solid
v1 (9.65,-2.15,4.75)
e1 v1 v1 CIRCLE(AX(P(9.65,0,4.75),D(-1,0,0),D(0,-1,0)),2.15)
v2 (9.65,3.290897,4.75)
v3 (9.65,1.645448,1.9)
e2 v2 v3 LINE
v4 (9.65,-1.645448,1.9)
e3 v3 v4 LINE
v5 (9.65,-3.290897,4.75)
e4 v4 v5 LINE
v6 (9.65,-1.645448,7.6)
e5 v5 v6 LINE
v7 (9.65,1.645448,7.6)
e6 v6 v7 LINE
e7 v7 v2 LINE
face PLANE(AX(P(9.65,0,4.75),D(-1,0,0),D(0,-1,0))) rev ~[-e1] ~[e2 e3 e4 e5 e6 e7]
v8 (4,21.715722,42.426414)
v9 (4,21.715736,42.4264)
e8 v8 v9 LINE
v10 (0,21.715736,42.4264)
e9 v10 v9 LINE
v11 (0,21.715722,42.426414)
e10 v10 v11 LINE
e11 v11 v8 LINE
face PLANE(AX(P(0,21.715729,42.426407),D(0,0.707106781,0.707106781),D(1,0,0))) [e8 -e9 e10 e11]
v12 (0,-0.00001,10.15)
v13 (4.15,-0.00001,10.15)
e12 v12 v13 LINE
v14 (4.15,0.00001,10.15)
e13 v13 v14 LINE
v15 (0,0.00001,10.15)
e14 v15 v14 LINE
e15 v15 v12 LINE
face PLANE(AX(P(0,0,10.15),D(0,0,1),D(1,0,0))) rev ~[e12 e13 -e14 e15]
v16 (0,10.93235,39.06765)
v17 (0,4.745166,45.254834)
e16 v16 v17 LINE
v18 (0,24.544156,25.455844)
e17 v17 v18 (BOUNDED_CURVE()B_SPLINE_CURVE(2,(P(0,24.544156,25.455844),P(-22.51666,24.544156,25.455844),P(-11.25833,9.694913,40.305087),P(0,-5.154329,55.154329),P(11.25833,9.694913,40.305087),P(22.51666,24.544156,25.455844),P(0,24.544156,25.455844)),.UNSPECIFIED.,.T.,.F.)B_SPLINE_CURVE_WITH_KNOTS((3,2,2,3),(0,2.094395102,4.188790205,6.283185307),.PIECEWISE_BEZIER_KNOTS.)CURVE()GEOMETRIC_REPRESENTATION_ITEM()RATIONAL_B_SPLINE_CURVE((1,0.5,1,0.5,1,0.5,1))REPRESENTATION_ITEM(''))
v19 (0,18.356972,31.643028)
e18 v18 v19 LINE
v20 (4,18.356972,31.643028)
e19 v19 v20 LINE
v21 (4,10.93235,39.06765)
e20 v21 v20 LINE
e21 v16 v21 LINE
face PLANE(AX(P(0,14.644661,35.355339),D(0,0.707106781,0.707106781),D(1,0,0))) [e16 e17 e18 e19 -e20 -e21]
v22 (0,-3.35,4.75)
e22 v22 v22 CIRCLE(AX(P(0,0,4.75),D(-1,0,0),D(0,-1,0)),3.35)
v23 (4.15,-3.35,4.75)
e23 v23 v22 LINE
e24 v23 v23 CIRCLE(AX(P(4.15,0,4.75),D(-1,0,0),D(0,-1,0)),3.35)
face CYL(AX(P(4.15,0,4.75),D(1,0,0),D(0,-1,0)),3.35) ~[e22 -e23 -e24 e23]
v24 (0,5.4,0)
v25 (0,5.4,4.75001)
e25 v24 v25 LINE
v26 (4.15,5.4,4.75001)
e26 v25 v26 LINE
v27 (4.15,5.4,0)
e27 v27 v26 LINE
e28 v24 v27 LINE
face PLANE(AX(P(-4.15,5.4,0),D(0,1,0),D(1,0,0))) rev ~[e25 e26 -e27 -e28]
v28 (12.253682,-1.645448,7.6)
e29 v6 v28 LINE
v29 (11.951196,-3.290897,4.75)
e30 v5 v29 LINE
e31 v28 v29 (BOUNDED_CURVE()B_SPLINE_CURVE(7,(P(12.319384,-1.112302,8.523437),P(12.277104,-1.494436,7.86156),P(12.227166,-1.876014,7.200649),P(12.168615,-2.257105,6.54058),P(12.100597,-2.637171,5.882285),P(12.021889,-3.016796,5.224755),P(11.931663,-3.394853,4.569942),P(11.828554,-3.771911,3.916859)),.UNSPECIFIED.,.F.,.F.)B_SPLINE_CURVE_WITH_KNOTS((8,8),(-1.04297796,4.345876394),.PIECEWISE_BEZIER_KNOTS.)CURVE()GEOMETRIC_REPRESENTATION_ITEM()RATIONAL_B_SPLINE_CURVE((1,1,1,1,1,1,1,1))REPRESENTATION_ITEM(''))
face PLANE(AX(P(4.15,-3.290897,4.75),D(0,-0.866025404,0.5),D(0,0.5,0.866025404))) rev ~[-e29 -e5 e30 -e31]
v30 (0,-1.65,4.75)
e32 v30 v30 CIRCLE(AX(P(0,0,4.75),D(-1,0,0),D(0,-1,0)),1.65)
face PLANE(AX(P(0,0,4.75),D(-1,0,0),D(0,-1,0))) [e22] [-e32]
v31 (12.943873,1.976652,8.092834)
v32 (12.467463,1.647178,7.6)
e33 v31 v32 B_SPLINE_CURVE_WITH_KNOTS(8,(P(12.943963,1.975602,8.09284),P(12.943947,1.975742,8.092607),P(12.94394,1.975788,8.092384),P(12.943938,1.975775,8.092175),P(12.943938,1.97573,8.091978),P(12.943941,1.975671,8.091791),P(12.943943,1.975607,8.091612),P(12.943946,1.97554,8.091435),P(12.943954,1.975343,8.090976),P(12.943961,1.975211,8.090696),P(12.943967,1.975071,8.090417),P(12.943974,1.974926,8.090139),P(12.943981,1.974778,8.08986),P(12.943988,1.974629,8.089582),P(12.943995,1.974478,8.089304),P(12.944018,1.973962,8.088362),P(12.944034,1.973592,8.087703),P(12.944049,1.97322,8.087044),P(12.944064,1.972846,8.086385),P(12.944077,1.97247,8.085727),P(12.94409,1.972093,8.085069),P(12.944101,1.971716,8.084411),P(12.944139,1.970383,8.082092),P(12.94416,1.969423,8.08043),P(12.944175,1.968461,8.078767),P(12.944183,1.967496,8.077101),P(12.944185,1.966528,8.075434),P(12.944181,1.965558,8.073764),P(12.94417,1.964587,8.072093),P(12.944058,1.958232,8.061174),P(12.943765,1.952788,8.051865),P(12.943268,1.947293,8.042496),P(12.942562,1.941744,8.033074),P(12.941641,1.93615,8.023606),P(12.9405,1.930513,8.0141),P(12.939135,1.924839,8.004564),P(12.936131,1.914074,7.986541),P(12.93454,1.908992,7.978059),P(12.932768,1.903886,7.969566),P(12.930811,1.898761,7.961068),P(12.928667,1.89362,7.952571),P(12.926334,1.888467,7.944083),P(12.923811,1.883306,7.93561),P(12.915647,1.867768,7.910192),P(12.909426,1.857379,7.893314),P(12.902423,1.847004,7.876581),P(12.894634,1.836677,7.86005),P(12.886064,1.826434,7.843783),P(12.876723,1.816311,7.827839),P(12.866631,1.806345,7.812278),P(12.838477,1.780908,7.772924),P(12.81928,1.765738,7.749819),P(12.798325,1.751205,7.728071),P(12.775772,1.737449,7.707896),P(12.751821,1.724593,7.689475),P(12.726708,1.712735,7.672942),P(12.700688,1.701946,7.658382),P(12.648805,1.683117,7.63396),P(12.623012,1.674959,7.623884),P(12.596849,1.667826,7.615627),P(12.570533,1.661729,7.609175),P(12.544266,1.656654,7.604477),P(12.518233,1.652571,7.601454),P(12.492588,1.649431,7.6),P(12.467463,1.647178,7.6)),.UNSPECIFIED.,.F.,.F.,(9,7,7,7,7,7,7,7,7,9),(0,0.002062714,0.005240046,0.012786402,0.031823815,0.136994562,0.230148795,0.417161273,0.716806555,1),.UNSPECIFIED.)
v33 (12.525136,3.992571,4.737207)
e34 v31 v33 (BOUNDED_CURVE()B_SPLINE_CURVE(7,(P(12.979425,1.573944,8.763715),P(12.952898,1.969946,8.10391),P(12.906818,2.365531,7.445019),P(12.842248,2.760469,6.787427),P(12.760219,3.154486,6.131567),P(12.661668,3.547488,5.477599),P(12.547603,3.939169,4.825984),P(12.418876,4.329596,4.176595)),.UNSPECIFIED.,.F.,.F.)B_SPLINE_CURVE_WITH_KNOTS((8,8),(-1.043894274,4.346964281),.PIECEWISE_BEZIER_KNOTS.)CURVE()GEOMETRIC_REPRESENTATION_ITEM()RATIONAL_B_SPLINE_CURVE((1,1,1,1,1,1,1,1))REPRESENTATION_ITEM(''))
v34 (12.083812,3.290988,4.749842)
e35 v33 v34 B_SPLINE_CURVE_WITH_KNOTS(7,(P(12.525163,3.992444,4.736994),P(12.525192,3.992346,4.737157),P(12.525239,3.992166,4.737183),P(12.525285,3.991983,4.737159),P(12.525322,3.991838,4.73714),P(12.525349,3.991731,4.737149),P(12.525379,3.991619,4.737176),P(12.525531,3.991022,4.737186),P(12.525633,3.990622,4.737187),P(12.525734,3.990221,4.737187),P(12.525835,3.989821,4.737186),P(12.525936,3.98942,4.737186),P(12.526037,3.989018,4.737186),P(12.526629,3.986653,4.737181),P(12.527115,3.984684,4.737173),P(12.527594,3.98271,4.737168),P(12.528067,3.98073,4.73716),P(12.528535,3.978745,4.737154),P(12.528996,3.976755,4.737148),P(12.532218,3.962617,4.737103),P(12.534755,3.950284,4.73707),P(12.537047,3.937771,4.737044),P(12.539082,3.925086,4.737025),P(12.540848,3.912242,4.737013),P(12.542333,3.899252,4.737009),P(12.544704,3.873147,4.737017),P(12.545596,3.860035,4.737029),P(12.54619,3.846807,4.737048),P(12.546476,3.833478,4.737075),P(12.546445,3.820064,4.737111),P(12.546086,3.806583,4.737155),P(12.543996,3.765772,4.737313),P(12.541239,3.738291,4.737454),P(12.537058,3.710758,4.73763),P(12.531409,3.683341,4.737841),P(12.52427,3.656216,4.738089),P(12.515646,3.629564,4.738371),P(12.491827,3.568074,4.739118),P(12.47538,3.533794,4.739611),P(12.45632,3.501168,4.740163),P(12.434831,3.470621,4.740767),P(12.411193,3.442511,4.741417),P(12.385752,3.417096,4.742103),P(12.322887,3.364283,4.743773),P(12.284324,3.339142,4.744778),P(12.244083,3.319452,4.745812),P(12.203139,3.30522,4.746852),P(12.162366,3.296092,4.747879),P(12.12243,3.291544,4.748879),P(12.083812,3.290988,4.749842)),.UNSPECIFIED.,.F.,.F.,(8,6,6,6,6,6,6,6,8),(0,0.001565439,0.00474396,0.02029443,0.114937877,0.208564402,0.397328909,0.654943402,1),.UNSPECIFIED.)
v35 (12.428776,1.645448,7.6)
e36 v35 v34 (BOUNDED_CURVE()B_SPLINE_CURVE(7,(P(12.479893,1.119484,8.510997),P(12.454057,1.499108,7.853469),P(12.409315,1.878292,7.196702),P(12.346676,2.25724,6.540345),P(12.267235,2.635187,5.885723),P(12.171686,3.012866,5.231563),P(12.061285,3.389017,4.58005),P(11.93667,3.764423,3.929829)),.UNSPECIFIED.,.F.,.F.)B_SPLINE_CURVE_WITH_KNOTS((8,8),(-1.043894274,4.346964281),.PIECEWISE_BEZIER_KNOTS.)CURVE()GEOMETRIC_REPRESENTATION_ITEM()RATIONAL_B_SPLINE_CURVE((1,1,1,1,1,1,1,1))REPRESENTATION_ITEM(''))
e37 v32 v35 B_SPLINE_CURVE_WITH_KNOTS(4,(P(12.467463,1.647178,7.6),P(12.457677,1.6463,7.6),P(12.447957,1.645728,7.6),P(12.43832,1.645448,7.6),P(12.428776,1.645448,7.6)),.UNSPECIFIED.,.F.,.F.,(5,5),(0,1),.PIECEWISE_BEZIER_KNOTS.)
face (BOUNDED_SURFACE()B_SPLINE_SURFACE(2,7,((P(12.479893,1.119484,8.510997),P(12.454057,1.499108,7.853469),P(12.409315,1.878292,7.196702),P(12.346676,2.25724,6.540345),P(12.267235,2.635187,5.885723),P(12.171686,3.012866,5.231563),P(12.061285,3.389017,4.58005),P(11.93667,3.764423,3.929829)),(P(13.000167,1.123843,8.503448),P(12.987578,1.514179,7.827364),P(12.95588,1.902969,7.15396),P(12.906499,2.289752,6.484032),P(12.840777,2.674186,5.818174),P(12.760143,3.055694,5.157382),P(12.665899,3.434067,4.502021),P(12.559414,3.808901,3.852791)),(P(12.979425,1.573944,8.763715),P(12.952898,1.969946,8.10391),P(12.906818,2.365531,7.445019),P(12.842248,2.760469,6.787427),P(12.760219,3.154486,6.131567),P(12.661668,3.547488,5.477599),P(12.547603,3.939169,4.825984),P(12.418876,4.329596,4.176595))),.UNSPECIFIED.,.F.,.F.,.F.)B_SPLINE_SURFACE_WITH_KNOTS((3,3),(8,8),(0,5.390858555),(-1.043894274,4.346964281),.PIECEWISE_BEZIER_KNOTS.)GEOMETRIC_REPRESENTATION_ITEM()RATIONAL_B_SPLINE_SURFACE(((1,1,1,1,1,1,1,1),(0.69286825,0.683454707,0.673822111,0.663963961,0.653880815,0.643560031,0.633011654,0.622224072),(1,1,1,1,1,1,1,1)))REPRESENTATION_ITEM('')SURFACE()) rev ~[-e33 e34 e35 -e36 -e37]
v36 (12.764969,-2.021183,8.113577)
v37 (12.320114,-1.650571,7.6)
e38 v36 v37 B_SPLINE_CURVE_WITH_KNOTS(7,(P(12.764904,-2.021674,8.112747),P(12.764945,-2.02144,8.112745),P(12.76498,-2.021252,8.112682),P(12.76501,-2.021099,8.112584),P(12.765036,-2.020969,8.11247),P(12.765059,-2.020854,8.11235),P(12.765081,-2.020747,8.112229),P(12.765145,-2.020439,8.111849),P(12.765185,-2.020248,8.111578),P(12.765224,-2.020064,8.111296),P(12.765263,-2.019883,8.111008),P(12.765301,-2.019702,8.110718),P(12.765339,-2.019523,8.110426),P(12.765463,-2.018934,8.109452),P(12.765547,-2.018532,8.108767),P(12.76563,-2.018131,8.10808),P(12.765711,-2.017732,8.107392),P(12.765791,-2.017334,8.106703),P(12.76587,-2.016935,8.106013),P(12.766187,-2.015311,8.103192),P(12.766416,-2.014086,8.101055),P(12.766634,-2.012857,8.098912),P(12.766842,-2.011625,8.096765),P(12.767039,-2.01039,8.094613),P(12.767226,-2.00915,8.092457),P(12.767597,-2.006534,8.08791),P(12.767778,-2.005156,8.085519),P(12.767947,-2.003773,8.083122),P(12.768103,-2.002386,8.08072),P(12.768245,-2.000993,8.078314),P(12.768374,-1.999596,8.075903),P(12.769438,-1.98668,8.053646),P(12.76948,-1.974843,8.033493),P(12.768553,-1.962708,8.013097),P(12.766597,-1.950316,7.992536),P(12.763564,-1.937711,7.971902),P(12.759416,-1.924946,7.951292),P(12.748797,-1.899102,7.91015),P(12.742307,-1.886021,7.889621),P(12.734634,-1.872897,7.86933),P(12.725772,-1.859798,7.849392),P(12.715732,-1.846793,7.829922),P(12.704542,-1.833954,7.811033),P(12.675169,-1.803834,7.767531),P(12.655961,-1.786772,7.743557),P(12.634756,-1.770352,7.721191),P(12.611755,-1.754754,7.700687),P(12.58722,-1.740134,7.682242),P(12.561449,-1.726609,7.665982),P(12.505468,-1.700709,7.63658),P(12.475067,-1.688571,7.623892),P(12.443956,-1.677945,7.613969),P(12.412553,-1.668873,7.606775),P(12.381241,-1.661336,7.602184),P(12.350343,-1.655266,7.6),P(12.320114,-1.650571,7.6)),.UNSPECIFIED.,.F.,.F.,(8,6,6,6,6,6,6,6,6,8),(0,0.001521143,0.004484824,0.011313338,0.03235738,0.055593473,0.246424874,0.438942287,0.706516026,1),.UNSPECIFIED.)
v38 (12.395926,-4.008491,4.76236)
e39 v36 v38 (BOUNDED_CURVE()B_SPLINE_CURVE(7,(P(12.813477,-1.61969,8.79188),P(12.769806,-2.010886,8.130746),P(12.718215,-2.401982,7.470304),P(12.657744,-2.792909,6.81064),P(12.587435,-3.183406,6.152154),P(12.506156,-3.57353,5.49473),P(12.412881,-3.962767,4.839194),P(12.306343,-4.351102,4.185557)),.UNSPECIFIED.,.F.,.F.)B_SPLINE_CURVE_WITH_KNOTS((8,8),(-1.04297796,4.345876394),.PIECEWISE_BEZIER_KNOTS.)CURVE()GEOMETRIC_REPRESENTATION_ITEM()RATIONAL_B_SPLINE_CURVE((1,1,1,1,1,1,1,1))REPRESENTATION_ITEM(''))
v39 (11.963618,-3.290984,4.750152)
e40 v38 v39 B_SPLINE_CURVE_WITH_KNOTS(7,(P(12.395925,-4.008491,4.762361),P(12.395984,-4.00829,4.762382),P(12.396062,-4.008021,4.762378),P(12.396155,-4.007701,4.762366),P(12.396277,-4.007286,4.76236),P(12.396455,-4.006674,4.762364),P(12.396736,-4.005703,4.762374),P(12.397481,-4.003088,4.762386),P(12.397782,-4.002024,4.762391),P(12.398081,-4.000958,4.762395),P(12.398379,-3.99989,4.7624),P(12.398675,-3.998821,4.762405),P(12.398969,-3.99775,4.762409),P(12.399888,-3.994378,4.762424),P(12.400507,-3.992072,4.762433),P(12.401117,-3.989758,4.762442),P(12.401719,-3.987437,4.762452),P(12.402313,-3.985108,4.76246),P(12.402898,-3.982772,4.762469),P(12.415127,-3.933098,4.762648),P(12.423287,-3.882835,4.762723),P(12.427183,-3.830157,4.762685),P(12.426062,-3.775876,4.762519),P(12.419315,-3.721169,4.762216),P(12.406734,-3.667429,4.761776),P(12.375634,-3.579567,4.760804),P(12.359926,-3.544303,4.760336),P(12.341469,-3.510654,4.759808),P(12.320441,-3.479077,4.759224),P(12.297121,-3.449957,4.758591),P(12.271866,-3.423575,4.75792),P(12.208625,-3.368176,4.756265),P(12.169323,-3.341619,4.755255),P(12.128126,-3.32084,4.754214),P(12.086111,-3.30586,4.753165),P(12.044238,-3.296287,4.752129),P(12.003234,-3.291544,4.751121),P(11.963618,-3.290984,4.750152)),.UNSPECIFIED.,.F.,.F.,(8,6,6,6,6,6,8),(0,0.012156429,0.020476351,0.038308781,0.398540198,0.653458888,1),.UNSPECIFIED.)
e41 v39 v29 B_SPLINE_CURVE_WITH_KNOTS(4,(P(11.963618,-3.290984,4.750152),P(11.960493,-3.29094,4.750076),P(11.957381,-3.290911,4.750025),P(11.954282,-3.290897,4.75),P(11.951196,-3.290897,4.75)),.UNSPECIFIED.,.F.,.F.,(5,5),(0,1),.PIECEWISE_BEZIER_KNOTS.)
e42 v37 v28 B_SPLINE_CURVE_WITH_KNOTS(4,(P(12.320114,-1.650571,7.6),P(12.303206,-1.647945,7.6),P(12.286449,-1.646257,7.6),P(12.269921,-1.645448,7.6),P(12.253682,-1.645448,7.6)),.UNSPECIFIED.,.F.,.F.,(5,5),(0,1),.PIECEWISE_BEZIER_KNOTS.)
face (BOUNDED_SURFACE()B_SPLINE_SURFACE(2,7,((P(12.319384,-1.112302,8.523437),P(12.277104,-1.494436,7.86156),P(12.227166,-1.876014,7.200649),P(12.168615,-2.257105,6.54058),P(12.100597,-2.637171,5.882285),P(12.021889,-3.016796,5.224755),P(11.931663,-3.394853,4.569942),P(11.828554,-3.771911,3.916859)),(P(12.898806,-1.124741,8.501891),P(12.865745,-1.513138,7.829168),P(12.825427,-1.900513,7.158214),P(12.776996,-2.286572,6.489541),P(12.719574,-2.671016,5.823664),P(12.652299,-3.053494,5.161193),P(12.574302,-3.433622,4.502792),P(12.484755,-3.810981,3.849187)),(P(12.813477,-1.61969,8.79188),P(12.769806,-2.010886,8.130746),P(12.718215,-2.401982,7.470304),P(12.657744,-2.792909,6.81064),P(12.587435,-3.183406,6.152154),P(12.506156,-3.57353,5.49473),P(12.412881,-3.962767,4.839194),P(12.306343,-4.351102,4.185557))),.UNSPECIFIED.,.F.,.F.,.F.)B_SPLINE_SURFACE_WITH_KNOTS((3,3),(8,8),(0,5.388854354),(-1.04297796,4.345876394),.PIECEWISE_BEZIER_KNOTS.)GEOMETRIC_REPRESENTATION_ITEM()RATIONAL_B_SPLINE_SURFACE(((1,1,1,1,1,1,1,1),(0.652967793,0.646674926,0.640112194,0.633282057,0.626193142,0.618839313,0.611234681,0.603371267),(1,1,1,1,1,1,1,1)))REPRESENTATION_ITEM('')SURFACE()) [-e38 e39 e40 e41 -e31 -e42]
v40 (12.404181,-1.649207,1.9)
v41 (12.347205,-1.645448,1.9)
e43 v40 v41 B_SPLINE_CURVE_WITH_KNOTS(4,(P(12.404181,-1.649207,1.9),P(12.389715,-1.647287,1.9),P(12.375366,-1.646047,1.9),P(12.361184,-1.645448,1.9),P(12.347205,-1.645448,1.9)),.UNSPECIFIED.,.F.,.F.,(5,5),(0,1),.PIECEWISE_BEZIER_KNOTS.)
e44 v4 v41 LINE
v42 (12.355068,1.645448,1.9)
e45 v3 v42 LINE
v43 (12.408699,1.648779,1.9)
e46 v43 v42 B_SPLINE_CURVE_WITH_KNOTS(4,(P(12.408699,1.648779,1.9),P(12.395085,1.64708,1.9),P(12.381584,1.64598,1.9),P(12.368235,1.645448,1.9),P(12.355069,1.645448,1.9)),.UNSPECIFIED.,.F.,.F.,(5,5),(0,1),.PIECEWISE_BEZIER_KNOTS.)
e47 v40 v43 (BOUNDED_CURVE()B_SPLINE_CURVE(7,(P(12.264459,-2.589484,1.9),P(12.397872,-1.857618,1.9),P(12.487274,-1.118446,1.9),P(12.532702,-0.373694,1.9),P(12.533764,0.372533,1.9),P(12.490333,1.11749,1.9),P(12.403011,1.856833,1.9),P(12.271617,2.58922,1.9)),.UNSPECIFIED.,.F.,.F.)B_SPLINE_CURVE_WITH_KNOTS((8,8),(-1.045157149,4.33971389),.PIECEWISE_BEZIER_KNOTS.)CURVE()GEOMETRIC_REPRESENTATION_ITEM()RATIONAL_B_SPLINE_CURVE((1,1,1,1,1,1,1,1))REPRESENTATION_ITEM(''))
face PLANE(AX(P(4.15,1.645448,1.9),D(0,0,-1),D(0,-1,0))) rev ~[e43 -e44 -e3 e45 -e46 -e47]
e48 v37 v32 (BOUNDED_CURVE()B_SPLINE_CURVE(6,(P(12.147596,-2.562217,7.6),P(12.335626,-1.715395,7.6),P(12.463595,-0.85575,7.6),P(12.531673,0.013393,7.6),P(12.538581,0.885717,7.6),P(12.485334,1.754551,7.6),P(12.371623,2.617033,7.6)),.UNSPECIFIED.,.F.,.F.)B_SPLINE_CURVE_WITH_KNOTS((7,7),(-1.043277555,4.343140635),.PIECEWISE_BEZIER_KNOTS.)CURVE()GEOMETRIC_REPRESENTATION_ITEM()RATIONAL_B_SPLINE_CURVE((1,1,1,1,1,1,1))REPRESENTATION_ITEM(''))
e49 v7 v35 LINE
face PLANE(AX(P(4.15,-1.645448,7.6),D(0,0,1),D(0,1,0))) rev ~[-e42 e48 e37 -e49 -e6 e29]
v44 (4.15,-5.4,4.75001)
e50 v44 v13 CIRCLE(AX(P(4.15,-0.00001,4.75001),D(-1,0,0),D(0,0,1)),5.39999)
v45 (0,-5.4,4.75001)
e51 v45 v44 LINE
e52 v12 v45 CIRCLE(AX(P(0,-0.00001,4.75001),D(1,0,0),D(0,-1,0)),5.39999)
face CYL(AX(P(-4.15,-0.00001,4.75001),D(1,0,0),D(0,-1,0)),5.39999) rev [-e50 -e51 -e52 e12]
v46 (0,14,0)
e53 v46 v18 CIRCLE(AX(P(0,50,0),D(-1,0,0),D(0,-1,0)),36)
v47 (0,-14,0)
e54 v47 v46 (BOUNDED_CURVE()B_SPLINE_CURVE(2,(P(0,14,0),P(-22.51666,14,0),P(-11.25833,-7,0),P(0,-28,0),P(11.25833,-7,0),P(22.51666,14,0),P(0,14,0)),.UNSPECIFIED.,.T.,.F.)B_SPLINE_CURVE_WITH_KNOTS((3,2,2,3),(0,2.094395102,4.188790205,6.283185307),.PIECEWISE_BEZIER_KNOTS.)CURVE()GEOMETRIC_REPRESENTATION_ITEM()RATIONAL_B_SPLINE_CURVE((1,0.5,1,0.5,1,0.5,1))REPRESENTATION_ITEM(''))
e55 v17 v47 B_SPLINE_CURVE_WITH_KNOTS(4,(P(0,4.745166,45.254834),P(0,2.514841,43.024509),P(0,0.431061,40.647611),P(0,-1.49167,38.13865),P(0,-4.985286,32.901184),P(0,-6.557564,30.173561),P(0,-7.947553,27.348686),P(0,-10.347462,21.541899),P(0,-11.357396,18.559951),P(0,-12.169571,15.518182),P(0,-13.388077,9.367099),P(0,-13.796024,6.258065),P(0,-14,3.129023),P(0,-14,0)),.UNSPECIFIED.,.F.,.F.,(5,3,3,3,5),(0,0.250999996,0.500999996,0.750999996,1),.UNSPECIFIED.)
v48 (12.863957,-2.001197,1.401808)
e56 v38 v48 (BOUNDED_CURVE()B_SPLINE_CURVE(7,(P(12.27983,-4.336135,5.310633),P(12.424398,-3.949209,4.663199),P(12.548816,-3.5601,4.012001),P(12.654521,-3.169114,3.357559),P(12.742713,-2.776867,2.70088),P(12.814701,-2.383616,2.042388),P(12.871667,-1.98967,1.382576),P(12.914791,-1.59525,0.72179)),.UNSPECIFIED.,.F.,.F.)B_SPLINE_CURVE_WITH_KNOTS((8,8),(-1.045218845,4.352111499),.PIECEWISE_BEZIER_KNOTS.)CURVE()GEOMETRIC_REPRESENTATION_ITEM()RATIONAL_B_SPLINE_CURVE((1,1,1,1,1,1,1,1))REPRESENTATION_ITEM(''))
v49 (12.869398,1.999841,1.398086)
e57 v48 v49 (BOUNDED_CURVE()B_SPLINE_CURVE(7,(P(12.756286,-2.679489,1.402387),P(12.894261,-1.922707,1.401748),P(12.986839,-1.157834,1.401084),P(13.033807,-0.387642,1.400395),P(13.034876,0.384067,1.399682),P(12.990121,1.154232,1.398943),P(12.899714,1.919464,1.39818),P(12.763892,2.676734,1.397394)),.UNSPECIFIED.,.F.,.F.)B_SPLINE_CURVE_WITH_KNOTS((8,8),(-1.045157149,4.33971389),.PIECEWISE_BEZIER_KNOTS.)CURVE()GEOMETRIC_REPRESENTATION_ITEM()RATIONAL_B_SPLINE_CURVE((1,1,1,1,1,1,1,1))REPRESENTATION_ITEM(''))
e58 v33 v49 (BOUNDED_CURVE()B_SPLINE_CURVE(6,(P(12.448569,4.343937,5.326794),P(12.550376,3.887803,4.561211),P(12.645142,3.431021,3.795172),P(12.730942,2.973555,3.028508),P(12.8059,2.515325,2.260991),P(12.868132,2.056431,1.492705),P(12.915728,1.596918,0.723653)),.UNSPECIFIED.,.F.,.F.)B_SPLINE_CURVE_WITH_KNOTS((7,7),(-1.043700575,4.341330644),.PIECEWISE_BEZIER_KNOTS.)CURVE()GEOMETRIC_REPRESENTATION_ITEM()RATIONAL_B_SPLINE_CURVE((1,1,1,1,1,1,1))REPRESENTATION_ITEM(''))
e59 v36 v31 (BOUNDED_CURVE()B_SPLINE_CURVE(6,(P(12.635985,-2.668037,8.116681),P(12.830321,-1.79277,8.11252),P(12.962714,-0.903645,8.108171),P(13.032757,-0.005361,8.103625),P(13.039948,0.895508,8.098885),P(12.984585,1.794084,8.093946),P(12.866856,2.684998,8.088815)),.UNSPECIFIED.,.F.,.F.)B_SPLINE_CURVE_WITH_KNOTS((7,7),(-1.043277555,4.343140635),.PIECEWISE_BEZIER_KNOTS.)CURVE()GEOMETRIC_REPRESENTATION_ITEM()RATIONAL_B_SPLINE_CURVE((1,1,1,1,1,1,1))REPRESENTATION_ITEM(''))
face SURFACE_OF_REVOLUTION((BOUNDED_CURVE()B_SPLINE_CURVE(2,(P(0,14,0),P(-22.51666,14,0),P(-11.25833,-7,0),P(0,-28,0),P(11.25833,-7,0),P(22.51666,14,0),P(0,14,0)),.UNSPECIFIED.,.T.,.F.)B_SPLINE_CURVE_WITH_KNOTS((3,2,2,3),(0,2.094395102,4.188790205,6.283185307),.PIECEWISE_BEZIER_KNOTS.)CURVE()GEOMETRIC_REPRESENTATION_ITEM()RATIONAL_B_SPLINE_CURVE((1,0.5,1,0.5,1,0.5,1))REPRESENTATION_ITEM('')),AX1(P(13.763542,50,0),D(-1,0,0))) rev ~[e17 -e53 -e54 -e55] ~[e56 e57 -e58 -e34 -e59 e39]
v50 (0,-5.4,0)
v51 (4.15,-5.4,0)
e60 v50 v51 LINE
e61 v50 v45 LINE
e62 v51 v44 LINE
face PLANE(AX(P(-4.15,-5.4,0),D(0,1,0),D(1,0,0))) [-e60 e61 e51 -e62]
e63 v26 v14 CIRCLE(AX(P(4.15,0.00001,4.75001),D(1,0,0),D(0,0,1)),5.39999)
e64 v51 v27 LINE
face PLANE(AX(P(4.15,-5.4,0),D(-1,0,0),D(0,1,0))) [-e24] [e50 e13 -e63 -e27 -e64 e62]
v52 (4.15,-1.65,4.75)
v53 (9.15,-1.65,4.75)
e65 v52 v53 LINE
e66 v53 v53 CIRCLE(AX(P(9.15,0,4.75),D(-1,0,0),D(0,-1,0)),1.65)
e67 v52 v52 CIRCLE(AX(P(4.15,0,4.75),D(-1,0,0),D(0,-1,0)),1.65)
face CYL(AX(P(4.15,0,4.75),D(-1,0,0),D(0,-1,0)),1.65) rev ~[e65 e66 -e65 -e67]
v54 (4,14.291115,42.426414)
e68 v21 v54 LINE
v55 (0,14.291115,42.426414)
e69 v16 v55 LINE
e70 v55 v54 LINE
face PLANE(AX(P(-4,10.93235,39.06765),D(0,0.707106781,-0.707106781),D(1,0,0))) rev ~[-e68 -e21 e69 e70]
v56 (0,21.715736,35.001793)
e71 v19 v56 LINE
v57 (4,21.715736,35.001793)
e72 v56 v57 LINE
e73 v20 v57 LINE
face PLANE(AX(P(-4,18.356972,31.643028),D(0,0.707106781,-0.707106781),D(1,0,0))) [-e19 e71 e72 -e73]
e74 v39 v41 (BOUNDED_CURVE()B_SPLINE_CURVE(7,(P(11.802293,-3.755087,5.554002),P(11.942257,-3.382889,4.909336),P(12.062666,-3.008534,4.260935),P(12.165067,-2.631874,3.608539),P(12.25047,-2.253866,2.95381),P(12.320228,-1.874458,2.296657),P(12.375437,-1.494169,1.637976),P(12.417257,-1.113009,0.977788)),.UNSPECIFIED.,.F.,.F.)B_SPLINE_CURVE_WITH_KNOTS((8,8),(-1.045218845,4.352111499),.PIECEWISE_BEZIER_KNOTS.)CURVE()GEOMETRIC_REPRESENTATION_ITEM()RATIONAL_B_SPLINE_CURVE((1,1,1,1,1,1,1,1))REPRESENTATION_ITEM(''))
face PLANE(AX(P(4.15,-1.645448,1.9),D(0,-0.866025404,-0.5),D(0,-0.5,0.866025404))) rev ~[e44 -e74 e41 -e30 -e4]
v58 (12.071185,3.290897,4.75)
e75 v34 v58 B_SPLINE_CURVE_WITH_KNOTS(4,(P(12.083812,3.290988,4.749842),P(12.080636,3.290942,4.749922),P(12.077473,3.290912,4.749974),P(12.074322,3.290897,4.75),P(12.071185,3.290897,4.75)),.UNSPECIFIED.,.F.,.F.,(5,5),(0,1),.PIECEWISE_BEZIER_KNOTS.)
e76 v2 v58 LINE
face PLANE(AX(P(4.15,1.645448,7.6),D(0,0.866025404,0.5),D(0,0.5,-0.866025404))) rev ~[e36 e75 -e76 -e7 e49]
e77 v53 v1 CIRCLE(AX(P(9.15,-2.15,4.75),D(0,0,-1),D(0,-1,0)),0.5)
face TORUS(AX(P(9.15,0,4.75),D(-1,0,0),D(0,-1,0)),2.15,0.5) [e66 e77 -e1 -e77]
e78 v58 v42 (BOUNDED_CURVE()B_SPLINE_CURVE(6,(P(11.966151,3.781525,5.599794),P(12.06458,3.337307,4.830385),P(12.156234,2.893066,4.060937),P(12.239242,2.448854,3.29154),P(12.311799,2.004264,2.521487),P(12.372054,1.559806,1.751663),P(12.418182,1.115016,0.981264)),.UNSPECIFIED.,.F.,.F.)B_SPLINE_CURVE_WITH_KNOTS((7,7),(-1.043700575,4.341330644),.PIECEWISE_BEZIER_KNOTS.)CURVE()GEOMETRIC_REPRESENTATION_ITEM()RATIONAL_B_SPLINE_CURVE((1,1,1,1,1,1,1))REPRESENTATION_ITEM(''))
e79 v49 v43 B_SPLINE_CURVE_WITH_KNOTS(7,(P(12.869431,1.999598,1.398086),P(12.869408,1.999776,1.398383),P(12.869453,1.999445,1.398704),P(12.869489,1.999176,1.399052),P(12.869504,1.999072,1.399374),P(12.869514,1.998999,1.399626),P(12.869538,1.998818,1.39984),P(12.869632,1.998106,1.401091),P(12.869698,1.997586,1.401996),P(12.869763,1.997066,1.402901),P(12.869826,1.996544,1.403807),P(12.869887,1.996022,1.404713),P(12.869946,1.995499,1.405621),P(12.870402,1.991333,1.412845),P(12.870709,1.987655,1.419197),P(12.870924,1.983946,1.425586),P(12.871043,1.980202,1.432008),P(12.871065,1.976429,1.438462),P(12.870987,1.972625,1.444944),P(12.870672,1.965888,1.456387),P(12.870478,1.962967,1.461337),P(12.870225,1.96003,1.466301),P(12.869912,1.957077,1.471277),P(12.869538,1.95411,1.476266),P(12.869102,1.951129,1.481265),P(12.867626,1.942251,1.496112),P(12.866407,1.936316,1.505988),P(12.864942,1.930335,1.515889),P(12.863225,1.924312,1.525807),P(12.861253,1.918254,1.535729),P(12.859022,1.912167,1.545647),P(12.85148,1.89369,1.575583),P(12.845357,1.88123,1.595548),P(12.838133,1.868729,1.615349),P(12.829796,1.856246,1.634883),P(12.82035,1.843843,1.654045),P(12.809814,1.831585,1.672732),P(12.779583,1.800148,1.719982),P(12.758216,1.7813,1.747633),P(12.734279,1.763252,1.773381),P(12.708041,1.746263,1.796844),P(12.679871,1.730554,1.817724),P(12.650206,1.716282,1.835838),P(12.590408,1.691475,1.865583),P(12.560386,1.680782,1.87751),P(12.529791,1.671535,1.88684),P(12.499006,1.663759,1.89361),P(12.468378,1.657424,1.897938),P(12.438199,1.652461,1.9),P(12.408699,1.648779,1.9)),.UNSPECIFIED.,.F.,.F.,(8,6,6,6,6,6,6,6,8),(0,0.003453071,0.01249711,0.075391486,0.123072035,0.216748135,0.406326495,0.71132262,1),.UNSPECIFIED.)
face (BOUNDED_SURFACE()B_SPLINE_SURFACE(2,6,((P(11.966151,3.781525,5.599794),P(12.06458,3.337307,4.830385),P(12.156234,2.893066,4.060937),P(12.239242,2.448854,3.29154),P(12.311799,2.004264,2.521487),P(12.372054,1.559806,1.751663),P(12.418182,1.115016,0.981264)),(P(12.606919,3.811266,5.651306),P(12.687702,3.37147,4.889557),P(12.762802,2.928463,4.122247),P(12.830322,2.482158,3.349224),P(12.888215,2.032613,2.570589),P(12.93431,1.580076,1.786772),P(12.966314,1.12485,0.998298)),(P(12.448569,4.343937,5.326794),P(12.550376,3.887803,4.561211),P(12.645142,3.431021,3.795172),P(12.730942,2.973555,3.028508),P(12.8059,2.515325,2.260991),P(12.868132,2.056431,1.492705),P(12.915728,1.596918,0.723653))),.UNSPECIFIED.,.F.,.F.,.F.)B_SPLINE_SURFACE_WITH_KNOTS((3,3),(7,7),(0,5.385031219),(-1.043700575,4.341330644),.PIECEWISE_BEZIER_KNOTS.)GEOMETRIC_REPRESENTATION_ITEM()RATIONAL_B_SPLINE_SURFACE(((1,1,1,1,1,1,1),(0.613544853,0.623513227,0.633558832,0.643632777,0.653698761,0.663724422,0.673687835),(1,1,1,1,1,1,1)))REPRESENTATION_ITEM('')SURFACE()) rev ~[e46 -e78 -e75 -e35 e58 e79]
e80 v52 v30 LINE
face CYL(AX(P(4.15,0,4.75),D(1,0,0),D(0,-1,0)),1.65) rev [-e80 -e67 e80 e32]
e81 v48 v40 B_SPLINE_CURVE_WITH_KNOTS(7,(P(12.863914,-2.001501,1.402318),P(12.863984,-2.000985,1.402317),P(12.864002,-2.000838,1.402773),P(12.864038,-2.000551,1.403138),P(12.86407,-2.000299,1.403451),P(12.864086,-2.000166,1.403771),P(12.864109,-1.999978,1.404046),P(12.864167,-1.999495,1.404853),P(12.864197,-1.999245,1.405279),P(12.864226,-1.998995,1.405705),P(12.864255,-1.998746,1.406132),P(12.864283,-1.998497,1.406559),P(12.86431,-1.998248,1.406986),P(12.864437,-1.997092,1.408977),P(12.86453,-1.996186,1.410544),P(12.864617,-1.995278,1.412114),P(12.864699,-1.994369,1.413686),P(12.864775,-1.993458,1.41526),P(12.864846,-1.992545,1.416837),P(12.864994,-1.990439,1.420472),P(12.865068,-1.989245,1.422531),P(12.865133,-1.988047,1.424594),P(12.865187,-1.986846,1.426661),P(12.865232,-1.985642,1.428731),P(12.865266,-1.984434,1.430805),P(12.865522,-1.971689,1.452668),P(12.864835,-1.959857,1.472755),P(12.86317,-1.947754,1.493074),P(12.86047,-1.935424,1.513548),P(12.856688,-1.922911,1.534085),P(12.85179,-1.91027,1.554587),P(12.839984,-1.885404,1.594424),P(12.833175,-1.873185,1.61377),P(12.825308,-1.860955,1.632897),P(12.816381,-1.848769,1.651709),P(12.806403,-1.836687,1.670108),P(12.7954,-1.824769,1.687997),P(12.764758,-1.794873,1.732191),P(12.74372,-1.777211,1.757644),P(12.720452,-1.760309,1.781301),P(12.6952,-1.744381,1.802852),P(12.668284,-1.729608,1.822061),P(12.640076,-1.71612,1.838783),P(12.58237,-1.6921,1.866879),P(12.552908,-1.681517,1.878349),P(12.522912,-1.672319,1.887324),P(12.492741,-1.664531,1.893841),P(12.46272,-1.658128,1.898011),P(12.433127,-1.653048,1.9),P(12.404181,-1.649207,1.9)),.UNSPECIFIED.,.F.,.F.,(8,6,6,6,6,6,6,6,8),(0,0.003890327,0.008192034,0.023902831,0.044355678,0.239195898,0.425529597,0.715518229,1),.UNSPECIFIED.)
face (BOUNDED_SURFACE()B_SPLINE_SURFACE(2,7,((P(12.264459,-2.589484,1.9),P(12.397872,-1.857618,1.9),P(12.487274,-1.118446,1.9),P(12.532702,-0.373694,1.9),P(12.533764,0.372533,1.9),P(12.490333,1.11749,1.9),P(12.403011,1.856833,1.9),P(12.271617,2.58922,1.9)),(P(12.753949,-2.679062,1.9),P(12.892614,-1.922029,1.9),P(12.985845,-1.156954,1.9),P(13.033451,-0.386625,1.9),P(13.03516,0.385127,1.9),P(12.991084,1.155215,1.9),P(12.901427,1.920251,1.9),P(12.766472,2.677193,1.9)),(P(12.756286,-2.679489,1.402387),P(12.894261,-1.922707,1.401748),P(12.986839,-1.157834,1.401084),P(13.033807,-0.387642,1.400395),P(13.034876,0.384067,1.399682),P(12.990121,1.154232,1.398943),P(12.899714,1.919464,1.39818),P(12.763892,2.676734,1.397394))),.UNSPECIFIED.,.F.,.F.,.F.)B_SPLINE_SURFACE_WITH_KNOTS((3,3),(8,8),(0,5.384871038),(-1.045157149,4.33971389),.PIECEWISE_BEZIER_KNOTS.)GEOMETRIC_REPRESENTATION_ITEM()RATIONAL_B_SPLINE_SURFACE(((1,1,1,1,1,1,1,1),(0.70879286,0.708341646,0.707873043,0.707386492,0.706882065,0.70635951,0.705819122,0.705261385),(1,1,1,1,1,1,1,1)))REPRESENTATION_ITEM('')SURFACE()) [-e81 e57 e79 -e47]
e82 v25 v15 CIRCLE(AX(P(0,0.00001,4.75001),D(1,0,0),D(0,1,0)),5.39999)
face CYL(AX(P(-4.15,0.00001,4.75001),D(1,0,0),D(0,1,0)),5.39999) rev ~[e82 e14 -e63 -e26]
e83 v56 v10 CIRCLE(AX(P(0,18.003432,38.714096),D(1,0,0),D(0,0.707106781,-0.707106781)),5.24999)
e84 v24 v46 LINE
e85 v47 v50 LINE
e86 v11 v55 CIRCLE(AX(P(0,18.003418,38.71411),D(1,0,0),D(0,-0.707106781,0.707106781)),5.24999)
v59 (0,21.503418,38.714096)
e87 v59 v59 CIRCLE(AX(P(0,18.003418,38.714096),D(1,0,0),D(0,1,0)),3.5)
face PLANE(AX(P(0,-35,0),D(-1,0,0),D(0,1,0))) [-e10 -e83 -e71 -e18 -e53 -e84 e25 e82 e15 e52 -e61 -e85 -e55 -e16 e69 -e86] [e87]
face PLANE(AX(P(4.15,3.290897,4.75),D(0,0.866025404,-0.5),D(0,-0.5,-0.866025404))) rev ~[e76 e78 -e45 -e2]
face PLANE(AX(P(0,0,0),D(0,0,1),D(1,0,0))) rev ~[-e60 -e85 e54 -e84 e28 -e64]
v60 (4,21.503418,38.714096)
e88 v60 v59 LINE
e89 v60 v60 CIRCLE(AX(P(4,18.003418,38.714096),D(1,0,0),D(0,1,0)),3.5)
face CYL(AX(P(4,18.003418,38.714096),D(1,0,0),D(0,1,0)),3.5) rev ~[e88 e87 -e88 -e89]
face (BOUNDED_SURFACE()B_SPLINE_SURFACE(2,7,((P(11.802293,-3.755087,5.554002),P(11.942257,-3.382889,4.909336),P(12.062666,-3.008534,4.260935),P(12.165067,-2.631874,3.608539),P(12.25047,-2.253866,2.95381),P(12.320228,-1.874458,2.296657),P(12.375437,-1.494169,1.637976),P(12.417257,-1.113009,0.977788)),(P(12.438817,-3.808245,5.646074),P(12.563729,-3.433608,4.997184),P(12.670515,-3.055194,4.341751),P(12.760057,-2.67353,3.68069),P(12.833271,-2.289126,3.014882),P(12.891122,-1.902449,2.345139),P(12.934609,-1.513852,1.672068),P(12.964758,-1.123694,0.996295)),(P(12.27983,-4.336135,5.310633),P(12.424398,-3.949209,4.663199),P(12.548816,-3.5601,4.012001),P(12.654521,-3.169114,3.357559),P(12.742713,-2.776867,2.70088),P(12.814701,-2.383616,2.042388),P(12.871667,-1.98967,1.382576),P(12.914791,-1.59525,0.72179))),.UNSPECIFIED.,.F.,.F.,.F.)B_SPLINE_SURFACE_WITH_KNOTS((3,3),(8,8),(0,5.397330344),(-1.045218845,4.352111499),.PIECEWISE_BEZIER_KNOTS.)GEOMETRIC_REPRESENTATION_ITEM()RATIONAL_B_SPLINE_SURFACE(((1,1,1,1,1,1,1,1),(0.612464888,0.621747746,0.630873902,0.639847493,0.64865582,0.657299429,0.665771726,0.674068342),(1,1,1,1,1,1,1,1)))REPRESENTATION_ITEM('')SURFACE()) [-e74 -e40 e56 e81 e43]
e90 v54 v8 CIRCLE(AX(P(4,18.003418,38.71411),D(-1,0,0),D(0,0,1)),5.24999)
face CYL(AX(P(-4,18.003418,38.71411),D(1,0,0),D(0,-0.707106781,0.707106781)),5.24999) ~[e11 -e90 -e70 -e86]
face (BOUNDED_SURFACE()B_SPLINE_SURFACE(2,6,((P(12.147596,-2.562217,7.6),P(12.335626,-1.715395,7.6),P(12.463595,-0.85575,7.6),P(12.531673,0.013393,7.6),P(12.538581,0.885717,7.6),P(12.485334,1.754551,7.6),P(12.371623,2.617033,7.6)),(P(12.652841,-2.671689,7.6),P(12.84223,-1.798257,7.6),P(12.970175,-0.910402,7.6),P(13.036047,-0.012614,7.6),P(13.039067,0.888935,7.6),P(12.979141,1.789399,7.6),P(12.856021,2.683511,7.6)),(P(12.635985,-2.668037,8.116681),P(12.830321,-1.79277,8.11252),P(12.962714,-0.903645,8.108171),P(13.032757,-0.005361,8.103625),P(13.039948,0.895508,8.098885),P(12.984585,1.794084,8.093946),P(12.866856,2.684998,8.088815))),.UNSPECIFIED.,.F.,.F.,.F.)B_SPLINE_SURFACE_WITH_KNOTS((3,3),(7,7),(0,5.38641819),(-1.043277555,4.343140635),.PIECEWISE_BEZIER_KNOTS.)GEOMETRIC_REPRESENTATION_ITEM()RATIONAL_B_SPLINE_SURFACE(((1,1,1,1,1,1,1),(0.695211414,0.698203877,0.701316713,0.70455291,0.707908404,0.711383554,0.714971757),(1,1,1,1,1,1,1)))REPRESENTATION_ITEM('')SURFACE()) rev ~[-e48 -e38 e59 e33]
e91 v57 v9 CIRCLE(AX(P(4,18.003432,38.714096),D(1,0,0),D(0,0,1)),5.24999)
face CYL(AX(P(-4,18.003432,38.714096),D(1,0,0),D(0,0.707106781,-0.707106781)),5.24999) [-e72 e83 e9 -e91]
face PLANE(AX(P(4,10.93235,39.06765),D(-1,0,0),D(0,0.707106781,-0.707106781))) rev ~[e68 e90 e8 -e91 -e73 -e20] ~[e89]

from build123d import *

# Parameters (mm, degrees)
F0_W      = 8.3
F0_H      = 10.8
F1_ANGLE  = 45
F2_W      = 8
F2_H      = 10.5
F3_DEPTH  = 10
F4_R      = 5.24999
F5_R      = 3.5
F6_DEPTH  = 17.0010001
F7_DEPTH  = 10.15
F8_R      = 5.39999
F9_W      = 20
F9_H      = 70
F10_DEPTH = 50
F11_R     = 3.35
F11_R_2   = 1.65
F12_DEPTH = 4.15
F13_DEPTH = 25
F14_R     = 1.65
F15_DEPTH = 25
F16_DEPTH = 5.5
F17_R     = 0.5


# Not quite as in the source:
# - a fillet or chamfer is up to 0.001 mm smaller than in the source, because OpenCascade refuses the exact size


with BuildPart() as f1:
    # F0 (on Top) → F1 (revolve)
    with BuildSketch(Plane.XY):
        with BuildLine():
            add(Edge.make_bspline(
                [(0, 14), (-22.5166604984, 14), (-11.2583302492, -7), (0, -28), (11.2583302492, -7), (22.5166604984, 14), (0, 14)],
                knots=[0, 0, 0, 2.0943951024, 2.0943951024, 4.1887902048, 4.1887902048, 6.2831853072, 6.2831853072, 6.2831853072], degree=2, weights=[1, 0.5, 1, 0.5, 1, 0.5, 1]))
        make_face()
        Rectangle(F0_W, F0_H, mode=Mode.SUBTRACT)
        Rectangle(F0_W, F0_H)
    revolve(axis=Axis((13.7635422871, 50, 0), (-1, 0, 0)), revolution_arc=F1_ANGLE)

    # F2 (on face) → F3 (join)
    with BuildSketch(Plane(origin=(0, 25, 25), x_dir=(1, 0, 0), z_dir=(0, 0.7071067812, 0.7071067812))):
        with Locations((0, -14.6446609407)):
            Rectangle(F2_W, F2_H)
    extrude(amount=F3_DEPTH)

    # F4 (radius 5.25 in the source; OpenCascade refuses exactly that, so slightly less here)
    f4_edges = [f1.edges().sort_by_distance(p)[0] for p in [
        (0, 18.003418, 46.138717),
        (0, 25.428039, 38.714096),
    ]]
    fillet(f4_edges, radius=F4_R)

    # F5 (on face) → F6 (cut, through all)
    with BuildSketch(Plane.YZ.offset(4)):
        with Locations((18.0034181513, 38.71409627)):
            Circle(F5_R)
    extrude(amount=-F6_DEPTH, mode=Mode.SUBTRACT)

    # F0 (on Top) → F7 (cut)
    with BuildSketch(Plane.XY):
        Rectangle(F0_W, F0_H)
    extrude(amount=F7_DEPTH, mode=Mode.SUBTRACT)

    # F8 (radius 5.4 in the source; OpenCascade refuses exactly that, so slightly less here)
    f8_edges = [f1.edges().sort_by_distance(p)[0] for p in [
        (0, 5.4, 10.15),
        (0, -5.4, 10.15),
    ]]
    fillet(f8_edges, radius=F8_R)

    # F9 (on Top) → F10 (intersect)
    with BuildSketch(Plane.XY):
        with Locations((10, 0)):
            Rectangle(F9_W, F9_H)
    extrude(amount=F10_DEPTH, mode=Mode.INTERSECT)

    # F11 (on face) → F12 (join)
    with BuildSketch(Plane(origin=(4.15, 0, 0), x_dir=(0, -1, 0), z_dir=(-1, 0, 0))):
        with Locations((0, 4.75)):
            Circle(F11_R)
        with Locations((0, 4.75)):
            Circle(F11_R_2, mode=Mode.SUBTRACT)
    extrude(amount=F12_DEPTH)

    # F13 (cut): a face of the model
    f13_faces = [f1.faces().sort_by_distance(p)[0] for p in [
        (4.15, 0, 4.75),
    ]]
    extrude(f13_faces, amount=-F13_DEPTH, mode=Mode.SUBTRACT)

    # F14 (on face) → F15 (cut)
    with BuildSketch(Plane(origin=(4.15, 0, 0), x_dir=(0, -1, 0), z_dir=(-1, 0, 0))):
        Polygon((1.6454482672, 7.6), (-1.6454482672, 7.6), (-3.2908965344, 4.75), (-1.6454482672, 1.9), (1.6454482672, 1.9), (3.2908965344, 4.75), align=None)
        with Locations((0, 4.75)):
            Circle(F14_R, mode=Mode.SUBTRACT)
    extrude(amount=-F15_DEPTH, mode=Mode.SUBTRACT)

    # F14 (on face) → F16 (join)
    with BuildSketch(Plane(origin=(4.15, 0, 0), x_dir=(0, -1, 0), z_dir=(-1, 0, 0))):
        Polygon((1.6454482672, 7.6), (-1.6454482672, 7.6), (-3.2908965344, 4.75), (-1.6454482672, 1.9), (1.6454482672, 1.9), (3.2908965344, 4.75), align=None)
        with Locations((0, 4.75)):
            Circle(F14_R, mode=Mode.SUBTRACT)
    extrude(amount=-F16_DEPTH)

    # F17
    f17_edges = [f1.edges().sort_by_distance(p)[0] for p in [
        (12.999956, -0.000217, 1.9),
        (12.77819, -2.469724, 3.327687),
        (12.731462, -2.468902, 6.173737),
        (12.988931, -0.003353, 7.6),
        (12.857066, 2.469489, 6.17272),
        (12.81516, 2.468662, 3.325848),
        (9.65, 1.65, 4.75),
    ]]
    fillet(f17_edges, radius=F17_R)


solid = f1.part
